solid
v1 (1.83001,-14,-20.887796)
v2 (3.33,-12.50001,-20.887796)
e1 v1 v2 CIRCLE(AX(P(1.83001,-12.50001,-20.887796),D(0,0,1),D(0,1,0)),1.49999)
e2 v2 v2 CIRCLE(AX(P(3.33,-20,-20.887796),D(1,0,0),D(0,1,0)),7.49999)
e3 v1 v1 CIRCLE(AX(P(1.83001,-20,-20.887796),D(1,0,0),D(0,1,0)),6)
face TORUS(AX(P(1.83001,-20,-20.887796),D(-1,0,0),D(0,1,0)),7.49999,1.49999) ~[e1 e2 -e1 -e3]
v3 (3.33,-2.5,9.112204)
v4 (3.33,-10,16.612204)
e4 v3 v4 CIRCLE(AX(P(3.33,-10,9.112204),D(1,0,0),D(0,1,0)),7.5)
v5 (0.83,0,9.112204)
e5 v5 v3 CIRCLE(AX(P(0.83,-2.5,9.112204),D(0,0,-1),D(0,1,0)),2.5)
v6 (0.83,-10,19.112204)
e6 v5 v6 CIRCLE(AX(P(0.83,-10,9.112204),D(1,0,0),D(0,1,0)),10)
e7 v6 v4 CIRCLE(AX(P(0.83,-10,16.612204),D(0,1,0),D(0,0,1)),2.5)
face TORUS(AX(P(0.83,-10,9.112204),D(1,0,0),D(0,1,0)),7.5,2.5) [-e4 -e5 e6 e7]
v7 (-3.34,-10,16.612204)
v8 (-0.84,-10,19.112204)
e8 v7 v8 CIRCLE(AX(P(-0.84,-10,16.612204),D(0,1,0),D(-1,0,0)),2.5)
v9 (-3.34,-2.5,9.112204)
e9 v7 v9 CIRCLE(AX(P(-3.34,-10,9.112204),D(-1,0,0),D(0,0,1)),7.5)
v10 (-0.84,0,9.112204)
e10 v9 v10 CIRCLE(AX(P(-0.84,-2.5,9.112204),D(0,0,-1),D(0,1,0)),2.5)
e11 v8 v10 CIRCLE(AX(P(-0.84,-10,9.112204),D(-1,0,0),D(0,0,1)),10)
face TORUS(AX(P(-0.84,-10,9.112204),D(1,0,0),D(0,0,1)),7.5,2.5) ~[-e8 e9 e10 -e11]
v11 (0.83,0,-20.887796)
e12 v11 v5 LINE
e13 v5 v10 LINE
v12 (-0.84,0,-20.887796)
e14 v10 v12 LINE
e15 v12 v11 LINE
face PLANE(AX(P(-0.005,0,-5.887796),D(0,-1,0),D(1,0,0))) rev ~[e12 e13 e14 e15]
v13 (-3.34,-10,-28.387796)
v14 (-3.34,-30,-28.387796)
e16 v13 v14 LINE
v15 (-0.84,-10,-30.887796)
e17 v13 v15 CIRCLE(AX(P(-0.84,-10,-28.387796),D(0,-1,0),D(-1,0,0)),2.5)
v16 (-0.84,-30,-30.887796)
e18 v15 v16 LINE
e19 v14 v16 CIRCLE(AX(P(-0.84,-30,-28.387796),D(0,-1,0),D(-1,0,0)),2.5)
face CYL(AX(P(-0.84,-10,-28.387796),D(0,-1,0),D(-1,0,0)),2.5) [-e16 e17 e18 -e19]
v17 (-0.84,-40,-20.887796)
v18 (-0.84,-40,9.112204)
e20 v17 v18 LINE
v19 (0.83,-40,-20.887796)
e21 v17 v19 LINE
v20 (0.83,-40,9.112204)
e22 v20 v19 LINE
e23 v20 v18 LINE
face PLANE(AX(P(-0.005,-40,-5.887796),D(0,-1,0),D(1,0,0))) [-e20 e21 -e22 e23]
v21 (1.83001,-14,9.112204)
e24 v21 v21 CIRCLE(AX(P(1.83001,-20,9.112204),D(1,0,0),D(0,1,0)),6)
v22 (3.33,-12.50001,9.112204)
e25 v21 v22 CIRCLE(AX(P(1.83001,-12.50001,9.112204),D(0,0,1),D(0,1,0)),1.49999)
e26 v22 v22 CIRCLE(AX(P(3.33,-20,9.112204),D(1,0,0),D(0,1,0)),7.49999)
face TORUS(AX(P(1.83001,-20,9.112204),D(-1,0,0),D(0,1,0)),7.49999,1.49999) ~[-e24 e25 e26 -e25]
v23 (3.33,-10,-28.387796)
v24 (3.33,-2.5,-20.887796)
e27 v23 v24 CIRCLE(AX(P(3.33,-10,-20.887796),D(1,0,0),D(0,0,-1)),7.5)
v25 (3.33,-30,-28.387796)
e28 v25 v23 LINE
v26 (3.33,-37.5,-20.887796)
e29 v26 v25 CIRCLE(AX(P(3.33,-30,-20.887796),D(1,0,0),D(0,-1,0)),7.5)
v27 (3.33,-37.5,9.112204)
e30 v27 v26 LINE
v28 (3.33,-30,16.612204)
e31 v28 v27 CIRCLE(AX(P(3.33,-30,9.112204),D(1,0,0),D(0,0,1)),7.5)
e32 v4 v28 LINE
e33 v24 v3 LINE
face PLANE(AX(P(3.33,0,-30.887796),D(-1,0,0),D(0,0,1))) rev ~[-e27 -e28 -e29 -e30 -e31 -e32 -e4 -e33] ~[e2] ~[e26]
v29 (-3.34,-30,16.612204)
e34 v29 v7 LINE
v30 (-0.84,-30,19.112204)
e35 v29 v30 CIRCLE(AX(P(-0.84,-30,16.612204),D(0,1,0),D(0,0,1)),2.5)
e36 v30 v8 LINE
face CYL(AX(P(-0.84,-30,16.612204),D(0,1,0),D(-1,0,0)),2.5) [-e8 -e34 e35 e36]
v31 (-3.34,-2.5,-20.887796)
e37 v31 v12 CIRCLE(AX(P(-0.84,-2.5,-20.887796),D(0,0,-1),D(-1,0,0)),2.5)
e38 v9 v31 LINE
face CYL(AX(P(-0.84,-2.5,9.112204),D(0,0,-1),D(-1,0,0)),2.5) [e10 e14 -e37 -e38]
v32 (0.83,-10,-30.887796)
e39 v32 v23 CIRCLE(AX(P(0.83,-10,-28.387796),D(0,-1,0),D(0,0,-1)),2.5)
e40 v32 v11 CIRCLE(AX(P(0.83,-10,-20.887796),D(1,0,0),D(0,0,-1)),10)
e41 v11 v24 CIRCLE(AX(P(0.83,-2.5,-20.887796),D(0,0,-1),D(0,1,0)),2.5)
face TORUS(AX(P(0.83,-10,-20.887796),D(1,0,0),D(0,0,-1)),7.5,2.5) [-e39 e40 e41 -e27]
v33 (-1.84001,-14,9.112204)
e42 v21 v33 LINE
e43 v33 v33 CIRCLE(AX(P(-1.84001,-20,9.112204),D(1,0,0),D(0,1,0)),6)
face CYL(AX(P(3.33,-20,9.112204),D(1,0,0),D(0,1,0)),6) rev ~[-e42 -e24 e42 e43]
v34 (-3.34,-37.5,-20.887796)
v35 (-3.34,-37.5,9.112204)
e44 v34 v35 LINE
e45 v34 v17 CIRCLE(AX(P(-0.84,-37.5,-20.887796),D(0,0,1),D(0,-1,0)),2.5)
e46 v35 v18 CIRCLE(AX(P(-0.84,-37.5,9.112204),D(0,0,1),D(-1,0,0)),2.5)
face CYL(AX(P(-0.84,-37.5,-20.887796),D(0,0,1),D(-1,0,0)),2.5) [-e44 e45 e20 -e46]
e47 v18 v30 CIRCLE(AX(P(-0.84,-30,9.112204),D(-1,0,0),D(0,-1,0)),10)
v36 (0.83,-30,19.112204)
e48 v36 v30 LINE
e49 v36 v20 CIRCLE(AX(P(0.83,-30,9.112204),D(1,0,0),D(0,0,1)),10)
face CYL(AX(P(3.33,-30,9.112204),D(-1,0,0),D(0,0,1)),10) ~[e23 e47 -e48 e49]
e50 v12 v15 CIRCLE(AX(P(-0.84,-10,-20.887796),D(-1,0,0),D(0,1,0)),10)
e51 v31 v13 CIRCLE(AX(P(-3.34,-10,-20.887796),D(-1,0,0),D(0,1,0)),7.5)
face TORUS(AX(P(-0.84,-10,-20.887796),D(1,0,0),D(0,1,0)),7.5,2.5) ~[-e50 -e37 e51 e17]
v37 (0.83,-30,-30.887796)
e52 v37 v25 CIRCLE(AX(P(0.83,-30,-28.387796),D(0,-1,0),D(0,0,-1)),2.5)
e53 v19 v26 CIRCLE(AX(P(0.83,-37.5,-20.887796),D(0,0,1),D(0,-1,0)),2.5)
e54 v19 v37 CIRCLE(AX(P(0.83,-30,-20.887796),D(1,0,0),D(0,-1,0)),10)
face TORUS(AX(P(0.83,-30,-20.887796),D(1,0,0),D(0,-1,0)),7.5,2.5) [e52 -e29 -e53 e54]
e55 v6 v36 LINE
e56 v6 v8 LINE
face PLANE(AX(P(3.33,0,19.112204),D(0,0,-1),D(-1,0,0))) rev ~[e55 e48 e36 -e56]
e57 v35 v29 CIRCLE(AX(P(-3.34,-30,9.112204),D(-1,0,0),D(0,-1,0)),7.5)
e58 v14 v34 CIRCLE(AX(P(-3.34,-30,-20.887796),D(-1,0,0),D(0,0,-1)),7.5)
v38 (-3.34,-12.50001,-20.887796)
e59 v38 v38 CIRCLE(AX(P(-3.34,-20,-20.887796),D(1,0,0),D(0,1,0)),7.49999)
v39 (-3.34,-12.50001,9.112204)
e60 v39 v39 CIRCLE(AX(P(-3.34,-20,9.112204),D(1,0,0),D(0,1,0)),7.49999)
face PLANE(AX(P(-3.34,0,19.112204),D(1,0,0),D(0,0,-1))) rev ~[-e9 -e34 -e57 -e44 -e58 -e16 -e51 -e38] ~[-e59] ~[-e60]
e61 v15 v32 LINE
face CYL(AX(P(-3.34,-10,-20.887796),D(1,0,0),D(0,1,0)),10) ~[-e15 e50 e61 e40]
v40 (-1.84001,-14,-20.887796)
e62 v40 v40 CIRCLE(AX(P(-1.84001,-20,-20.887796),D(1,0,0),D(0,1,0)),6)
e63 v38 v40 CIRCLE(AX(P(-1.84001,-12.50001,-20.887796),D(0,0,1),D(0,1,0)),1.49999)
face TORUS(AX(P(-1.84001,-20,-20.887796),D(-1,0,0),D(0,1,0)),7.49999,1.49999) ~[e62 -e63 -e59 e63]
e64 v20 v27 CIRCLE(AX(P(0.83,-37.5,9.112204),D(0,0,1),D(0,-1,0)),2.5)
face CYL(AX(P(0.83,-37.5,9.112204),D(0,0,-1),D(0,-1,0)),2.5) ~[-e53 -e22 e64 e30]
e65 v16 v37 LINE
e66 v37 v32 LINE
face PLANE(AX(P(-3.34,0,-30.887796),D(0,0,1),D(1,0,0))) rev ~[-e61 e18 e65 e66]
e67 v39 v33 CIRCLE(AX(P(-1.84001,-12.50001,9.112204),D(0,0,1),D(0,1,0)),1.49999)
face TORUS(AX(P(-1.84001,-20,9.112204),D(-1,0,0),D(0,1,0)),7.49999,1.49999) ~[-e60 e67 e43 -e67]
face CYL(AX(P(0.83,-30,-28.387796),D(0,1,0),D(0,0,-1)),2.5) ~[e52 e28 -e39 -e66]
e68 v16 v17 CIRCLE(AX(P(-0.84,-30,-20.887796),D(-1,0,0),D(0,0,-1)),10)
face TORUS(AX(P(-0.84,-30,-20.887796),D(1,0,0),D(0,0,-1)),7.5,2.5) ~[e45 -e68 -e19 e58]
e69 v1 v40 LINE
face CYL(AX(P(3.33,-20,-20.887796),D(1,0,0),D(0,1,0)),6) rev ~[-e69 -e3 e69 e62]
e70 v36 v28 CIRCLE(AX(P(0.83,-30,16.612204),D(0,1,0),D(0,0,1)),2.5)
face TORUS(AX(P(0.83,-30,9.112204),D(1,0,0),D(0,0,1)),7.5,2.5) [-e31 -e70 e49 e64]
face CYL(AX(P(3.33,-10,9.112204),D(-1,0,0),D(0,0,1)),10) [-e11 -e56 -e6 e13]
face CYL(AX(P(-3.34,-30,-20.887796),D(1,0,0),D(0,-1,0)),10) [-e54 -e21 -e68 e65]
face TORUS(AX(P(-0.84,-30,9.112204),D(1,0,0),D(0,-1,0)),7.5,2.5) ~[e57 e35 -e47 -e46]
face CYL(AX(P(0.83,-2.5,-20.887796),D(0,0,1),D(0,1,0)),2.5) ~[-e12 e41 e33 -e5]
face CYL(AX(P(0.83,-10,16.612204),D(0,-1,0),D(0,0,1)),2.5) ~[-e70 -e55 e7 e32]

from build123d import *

# Parameters (mm, degrees)
F1_DEPTH = 40
F2_R     = 6
F3_DEPTH = 25
F4_R     = 10
F5_R     = 2.5
F6_R     = 1.49999


# Not quite as in the source:
# - a fillet or chamfer is up to 0.001 mm smaller than in the source, because OpenCascade refuses the exact size
# - a feature names something its author has since deleted; it is built from what else it names


with BuildPart() as f1:
    # F0 (on Front) → F1 (new body)
    with BuildSketch(Plane.XZ):
        Polygon((-3.34, 19.1122043878), (-3.34, -0.8877956122), (-3.34, -30.8877956122), (3.33, -30.8877956122), (3.33, -0.8877956122), (3.33, 13.6661529541), (3.33, 19.1122043878), align=None)
    extrude(amount=F1_DEPTH)

    # F2 (on face) → F3 (cut)
    with BuildSketch(Plane.YZ.offset(3.33)):
        with Locations((-20, 9.1122043878)):
            Circle(F2_R)
        with Locations((-20, -20.8877956122)):
            Circle(F2_R)
    extrude(amount=-F3_DEPTH, mode=Mode.SUBTRACT)

    # F4
    f4_edges = [f1.edges().sort_by_distance(p)[0] for p in [
        (-0.005, -40, 19.112204),
        (-0.005, 0, 19.112204),
        (-0.005, 0, -30.887796),
        (-0.005, -40, -30.887796),
    ]]
    fillet(f4_edges, radius=F4_R)

    # F5
    f5_edges = [f1.edges().sort_by_distance(p)[0] for p in [
        (3.33, -20, 19.112204),
        (-3.34, -20, -30.887796),
        (-3.34, -20, 19.112204),
        (-3.34, -37.071068, 16.183272),
        (-3.34, -40, -5.887796),
        (-3.34, -37.071068, -27.958863),
        (-3.34, -2.928932, -27.958863),
        (-3.34, -2.928932, 16.183272),
        (-3.34, 0, -5.887796),
    ]]
    fillet(f5_edges, radius=F5_R)

    # F6 (radius 1.5 in the source; OpenCascade refuses exactly that, so slightly less here)
    f6_edges = [f1.edges().sort_by_distance(p)[0] for p in [
        (3.33, -26, 9.112204),
        (-0.005, -14, 9.112204),
        (-3.34, -26, 9.112204),
        (3.33, -26, -20.887796),
        (-3.34, -26, -20.887796),
    ]]
    fillet(f6_edges, radius=F6_R)


solid = f1.part
